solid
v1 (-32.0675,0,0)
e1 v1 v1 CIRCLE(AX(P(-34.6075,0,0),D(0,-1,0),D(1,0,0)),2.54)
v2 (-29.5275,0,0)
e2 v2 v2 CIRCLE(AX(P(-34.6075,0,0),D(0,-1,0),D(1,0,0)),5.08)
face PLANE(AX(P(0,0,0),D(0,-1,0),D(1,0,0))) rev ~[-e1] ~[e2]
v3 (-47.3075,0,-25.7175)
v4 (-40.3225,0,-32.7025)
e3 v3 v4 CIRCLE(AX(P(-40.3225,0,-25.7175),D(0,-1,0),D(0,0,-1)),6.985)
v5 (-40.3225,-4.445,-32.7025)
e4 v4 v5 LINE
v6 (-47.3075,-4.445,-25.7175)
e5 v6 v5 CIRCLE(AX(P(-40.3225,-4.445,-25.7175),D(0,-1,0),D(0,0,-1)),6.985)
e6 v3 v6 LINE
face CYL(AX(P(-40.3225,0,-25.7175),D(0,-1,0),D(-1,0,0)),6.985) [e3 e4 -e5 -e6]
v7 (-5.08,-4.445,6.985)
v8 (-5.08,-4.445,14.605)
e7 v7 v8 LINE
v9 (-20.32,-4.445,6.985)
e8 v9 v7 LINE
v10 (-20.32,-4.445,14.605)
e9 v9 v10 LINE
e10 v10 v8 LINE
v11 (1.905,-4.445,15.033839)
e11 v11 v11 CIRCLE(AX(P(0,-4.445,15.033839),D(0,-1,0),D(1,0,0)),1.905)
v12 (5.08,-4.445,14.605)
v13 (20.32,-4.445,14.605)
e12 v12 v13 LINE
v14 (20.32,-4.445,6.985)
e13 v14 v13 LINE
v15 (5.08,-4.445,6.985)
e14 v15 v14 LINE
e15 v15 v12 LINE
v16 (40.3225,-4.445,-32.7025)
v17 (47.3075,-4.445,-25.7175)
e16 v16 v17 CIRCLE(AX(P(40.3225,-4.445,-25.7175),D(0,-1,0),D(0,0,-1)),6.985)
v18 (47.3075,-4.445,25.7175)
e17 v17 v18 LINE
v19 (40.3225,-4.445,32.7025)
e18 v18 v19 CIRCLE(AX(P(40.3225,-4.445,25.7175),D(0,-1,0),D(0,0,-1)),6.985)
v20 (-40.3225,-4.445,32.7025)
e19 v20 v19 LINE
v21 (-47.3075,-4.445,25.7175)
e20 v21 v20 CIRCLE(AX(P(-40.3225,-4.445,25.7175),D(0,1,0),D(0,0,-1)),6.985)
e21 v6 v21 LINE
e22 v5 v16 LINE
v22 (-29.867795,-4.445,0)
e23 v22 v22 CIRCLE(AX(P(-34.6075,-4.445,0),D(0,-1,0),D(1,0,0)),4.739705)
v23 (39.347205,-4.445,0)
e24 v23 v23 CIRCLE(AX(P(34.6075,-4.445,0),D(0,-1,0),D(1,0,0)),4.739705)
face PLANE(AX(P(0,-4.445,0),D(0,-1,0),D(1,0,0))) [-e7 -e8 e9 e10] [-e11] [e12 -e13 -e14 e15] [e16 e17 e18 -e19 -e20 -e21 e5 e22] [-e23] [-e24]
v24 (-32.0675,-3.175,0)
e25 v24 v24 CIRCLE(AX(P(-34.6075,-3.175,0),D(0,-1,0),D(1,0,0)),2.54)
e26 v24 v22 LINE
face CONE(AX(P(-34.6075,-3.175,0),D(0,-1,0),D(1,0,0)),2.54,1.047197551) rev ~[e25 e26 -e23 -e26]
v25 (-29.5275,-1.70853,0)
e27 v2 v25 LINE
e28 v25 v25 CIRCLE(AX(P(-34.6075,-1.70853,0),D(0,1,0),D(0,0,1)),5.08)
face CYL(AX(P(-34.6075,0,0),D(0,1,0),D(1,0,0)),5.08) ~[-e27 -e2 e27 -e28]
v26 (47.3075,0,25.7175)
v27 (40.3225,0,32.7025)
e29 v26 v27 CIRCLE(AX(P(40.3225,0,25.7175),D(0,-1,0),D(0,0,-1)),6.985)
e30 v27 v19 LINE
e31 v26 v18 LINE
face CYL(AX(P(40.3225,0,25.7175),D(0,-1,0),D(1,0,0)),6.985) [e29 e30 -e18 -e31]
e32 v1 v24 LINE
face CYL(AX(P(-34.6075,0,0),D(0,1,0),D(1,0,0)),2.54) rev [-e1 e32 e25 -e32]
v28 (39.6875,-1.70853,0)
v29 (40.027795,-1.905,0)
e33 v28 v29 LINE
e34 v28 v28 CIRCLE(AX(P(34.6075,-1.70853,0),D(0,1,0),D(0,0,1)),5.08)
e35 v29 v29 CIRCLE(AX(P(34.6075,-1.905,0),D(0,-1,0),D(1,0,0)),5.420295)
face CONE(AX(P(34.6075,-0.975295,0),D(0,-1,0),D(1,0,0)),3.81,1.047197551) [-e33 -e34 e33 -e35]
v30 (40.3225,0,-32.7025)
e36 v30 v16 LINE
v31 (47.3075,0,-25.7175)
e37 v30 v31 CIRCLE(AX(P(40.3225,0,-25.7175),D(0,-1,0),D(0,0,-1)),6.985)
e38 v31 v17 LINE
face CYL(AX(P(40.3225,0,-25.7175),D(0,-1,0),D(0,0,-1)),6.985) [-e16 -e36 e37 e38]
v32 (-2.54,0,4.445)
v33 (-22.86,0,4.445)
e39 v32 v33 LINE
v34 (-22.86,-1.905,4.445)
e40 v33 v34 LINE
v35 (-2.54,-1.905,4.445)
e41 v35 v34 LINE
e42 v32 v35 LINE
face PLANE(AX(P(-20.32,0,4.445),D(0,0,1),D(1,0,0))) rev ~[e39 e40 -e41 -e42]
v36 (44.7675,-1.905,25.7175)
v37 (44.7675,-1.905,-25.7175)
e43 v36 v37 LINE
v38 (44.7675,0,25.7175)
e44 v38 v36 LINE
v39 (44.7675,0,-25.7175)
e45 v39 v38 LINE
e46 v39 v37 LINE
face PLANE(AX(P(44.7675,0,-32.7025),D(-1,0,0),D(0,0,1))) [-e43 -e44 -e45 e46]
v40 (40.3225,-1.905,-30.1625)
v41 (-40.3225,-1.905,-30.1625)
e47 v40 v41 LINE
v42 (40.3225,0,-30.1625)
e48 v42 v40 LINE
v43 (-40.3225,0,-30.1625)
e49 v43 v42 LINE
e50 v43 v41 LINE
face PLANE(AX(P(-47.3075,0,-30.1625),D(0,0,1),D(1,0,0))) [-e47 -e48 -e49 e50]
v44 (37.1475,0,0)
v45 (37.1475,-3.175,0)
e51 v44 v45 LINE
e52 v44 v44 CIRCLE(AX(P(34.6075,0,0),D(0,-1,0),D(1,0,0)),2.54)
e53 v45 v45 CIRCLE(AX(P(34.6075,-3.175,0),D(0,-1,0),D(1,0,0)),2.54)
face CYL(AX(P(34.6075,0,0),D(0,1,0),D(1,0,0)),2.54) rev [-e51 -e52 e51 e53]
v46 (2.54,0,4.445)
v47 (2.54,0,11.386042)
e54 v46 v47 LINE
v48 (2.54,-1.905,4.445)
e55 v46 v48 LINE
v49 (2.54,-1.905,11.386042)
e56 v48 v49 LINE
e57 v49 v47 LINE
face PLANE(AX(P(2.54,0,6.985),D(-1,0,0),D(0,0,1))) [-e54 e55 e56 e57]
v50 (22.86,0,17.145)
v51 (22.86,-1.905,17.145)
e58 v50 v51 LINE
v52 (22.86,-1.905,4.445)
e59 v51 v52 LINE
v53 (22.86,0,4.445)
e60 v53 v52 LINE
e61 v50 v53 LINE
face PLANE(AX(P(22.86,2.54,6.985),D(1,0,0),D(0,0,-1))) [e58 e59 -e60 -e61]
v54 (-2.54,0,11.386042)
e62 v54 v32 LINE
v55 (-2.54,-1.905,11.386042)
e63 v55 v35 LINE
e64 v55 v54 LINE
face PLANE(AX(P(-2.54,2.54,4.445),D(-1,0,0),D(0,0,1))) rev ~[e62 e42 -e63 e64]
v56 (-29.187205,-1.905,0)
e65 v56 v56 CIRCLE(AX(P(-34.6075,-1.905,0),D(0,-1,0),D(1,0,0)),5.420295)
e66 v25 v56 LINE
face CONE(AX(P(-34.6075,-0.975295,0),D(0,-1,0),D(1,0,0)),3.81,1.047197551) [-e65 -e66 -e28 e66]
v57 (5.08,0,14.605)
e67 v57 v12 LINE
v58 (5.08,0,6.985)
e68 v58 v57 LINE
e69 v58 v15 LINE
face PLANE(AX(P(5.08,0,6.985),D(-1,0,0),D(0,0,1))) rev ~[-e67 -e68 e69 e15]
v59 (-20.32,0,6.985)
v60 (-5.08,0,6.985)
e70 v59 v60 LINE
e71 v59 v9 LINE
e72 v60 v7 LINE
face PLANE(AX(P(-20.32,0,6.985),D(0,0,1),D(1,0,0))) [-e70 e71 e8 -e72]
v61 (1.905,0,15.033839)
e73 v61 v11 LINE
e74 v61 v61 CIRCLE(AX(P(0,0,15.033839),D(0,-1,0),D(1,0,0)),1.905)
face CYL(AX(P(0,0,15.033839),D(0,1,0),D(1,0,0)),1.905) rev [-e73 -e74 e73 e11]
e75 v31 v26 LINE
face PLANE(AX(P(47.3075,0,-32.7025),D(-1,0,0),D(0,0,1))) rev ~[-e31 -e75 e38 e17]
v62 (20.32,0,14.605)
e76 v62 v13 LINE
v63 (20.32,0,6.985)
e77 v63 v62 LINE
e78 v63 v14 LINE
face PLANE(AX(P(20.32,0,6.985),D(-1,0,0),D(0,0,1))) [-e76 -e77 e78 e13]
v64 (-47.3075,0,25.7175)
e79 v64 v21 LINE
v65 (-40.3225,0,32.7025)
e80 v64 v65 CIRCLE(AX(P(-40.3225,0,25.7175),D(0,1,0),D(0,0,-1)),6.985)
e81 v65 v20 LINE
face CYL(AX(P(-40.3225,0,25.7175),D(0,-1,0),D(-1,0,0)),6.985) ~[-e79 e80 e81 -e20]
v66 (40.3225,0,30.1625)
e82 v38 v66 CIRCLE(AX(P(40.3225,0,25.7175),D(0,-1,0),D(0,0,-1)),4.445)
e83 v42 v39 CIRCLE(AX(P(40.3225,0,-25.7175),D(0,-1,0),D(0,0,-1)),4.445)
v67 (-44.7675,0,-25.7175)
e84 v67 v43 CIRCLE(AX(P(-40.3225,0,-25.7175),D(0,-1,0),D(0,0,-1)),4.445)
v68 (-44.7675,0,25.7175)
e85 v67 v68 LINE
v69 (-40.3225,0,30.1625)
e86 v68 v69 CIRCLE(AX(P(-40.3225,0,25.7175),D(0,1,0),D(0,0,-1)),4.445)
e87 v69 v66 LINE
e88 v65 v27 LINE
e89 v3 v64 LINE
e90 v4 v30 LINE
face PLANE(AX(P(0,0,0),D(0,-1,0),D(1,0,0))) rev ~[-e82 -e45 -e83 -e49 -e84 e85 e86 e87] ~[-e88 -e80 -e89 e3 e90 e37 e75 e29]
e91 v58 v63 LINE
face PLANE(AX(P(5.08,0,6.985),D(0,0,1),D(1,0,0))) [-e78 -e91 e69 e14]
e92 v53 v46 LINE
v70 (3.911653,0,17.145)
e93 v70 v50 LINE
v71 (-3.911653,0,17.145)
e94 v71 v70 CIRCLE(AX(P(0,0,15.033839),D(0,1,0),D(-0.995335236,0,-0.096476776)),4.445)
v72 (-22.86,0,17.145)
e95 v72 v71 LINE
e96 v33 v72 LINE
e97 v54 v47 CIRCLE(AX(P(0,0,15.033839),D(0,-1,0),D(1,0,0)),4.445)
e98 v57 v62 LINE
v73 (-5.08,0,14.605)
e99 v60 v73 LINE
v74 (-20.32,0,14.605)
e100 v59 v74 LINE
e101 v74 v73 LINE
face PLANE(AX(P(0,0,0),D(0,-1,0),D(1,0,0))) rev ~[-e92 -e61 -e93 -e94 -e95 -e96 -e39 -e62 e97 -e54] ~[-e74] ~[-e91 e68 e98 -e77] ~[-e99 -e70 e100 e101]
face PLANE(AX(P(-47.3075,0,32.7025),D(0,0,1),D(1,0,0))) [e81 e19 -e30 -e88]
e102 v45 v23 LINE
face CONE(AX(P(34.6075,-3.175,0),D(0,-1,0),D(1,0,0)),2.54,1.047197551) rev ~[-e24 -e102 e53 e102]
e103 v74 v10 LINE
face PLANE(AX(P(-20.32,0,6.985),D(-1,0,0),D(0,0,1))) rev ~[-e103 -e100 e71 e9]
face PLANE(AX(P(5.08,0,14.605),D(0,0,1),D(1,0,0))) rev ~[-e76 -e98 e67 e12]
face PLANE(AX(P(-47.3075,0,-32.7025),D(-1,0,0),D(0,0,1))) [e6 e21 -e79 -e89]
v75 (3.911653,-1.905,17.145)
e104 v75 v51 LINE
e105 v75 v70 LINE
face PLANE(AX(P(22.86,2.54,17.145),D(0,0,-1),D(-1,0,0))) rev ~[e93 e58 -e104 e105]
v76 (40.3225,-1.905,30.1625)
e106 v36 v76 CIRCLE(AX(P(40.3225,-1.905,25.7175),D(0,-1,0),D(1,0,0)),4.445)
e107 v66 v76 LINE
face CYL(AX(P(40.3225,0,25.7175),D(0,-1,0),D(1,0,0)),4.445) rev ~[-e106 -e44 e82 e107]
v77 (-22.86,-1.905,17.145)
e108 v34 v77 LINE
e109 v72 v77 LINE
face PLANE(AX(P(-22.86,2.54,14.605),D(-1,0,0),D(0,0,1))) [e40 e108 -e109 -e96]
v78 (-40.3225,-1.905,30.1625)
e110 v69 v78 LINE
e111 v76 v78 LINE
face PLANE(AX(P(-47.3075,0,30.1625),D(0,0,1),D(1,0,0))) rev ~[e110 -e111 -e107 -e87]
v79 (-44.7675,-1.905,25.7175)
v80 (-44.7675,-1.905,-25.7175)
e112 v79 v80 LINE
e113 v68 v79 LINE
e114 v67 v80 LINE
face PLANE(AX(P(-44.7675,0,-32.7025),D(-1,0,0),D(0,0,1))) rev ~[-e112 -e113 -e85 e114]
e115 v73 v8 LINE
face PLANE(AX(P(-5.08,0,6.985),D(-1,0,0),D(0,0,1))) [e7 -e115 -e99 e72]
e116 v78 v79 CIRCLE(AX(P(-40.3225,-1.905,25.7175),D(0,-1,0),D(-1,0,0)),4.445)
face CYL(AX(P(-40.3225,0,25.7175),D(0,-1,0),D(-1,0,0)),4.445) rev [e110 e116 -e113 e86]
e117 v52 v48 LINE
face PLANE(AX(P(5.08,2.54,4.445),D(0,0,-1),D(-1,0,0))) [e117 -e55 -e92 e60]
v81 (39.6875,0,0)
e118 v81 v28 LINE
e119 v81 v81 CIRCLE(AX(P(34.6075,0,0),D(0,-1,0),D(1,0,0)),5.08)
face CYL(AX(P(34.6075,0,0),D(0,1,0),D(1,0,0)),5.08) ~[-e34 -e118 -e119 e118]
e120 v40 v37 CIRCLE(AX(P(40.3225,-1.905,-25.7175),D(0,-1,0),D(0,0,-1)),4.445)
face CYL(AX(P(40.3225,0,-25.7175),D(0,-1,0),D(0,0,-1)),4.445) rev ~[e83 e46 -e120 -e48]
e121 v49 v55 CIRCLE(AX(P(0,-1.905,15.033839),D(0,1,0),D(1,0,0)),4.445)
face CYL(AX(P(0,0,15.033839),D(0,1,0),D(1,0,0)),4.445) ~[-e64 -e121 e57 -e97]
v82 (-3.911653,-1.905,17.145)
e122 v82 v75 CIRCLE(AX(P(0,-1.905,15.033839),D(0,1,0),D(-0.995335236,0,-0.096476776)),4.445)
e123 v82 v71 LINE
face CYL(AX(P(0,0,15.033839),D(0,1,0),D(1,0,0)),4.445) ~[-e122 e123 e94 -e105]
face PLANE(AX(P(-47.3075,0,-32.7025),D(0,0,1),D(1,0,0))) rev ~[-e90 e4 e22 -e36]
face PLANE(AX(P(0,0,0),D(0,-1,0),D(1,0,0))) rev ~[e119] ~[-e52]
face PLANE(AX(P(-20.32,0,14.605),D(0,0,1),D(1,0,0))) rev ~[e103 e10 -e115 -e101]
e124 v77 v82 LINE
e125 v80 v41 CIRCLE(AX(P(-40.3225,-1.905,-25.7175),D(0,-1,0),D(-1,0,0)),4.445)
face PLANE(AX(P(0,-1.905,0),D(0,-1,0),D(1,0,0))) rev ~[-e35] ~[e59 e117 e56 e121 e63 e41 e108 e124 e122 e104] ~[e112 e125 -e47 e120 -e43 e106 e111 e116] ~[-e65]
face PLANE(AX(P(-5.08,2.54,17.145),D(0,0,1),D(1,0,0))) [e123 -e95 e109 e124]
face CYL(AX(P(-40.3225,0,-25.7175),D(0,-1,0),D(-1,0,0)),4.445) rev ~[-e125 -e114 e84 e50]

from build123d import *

# Parameters (mm, degrees)
F0_W        = 94.615
F0_H        = 65.405
F0_W_2      = 86.9950006521
F0_H_2      = 57.7850006521
F0_R        = 5.08
F0_R_2      = 2.413
F0_W_3      = 15.24
F0_H_3      = 7.62
F0_R_3      = 1.905
F0_R_4      = 2.54
F0_R_5      = 1.143
F0_W_4      = 7.112
F0_H_4      = 1.016
F1_DEPTH    = 4.445
F2_R        = 6.985
F3_SIZE2    = 2.1997045256
F3_SIZE     = 1.27
F3_2_SIZE2  = 2.1997045256
F3_2_SIZE   = 1.27
F4_T        = 2.54
F4_T3_DEPTH = 9.525


# Not quite as in the source:
# - a shell that OpenCascade refuses in one call is made with other operations: the cavity is built on its own and cut out


with BuildPart() as f1:
    # F0 (on Front) → F1 (new body)
    with BuildSketch(Plane.XZ):
        Rectangle(F0_W, F0_H)
        Rectangle(F0_W_2, F0_H_2, mode=Mode.SUBTRACT)
        Rectangle(F0_W_2, F0_H_2)
        with Locations((-34.6075, 0)):
            Circle(F0_R, mode=Mode.SUBTRACT)
        Polygon((24.765, 23.495), (24.765, -23.495), (3.556, -23.495), (-3.556, -23.495), (-24.765, -23.495), (-24.765, 23.495), align=None, mode=Mode.SUBTRACT)
        with Locations((34.6075, 0)):
            Circle(F0_R, mode=Mode.SUBTRACT)
        Polygon((-3.556, -22.479), (3.556, -22.479), (23.749, -22.479), (23.749, 22.479), (-23.749, 22.479), (-23.749, -22.479), align=None)
        with Locations((-19.685, -18.0975)):
            Circle(F0_R_2, mode=Mode.SUBTRACT)
        with Locations((19.685, -18.0975)):
            Circle(F0_R_2, mode=Mode.SUBTRACT)
        with Locations((-12.7, 10.795)):
            Rectangle(F0_W_3, F0_H_3, mode=Mode.SUBTRACT)
        with Locations((-19.685, 18.0975)):
            Circle(F0_R_2, mode=Mode.SUBTRACT)
        with Locations((0, 15.0338392705)):
            Circle(F0_R_3, mode=Mode.SUBTRACT)
        with Locations((12.7, 10.795)):
            Rectangle(F0_W_3, F0_H_3, mode=Mode.SUBTRACT)
        with Locations((19.685, 18.0975)):
            Circle(F0_R_2, mode=Mode.SUBTRACT)
        Polygon((3.556, -23.495), (24.765, -23.495), (24.765, 23.495), (-24.765, 23.495), (-24.765, -23.495), (-3.556, -23.495), (-3.556, -22.479), (-23.749, -22.479), (-23.749, 22.479), (23.749, 22.479), (23.749, -22.479), (3.556, -22.479), align=None)
        with Locations((34.6075, 0)):
            Circle(F0_R)
        with Locations((34.6075, 0)):
            Circle(F0_R_4, mode=Mode.SUBTRACT)
        with Locations((-34.6075, 0)):
            Circle(F0_R)
        with Locations((-34.6075, 0)):
            Circle(F0_R_4, mode=Mode.SUBTRACT)
        with Locations((-19.685, 18.0975)):
            Circle(F0_R_2)
        with Locations((-19.685, 18.0975)):
            Circle(F0_R_5, mode=Mode.SUBTRACT)
        with Locations((-19.685, -18.0975)):
            Circle(F0_R_2)
        with Locations((-19.685, -18.0975)):
            Circle(F0_R_5, mode=Mode.SUBTRACT)
        with Locations((19.685, -18.0975)):
            Circle(F0_R_2)
        with Locations((19.685, -18.0975)):
            Circle(F0_R_5, mode=Mode.SUBTRACT)
        with Locations((19.685, 18.0975)):
            Circle(F0_R_2)
        with Locations((19.685, 18.0975)):
            Circle(F0_R_5, mode=Mode.SUBTRACT)
        with Locations((0, -22.987)):
            Rectangle(F0_W_4, F0_H_4)
        with Locations((-19.685, 18.0975)):
            Circle(F0_R_5)
        with Locations((-19.685, -18.0975)):
            Circle(F0_R_5)
        with Locations((19.685, -18.0975)):
            Circle(F0_R_5)
        with Locations((19.685, 18.0975)):
            Circle(F0_R_5)
    extrude(amount=F1_DEPTH)

    # F2
    f2_edges = [f1.edges().sort_by_distance(p)[0] for p in [
        (-47.3075, -2.2225, 32.7025),
        (-47.3075, -2.2225, -32.7025),
        (47.3075, -2.2225, 32.7025),
        (47.3075, -2.2225, -32.7025),
    ]]
    fillet(f2_edges, radius=F2_R)

    # F3
    f3_edges = [f1.edges().sort_by_distance(p)[0] for p in [
        (-37.1475, -4.445, 0),
    ]]
    f3_side = f1.faces().sort_by_distance((-37.1475, -2.2225, 0))[0]
    chamfer(f3_edges, length=F3_SIZE, length2=F3_SIZE2, reference=f3_side)

    # F3#2
    f3_2_edges = [f1.edges().sort_by_distance(p)[0] for p in [
        (32.0675, -4.445, 0),
    ]]
    f3_2_side = f1.faces().sort_by_distance((32.0675, -2.2225, 0))[0]
    chamfer(f3_2_edges, length=F3_2_SIZE, length2=F3_2_SIZE2, reference=f3_2_side)

    # F4: shell of thickness 2.54, made by hand


with BuildPart() as f4_core1:
    # F4_t2: copy of F1
    add(f1.part)

    # the walls: a layer under each face that stays
    f4_faces = [f4_core1.faces().sort_by_distance(p)[0] for p in [
        (0, -4.445, 0),
        (30.9676477372, -3.81, 0),
        (-38.2473522628, -3.81, 0),
        (0, -2.2225, -32.7025),
        (-45.2616408666, -2.2225, -30.6566408666),
        (45.2616408666, -2.2225, -30.6566408666),
        (-47.3075, -2.2225, 0),
        (47.3075, -2.2225, 0),
        (-45.2616408666, -2.2225, 30.6566408666),
        (45.2616408666, -2.2225, 30.6566408666),
        (0, -2.2225, 32.7025),
        (20.32, -2.2225, 10.795),
        (12.7, -2.2225, 6.985),
        (5.08, -2.2225, 10.795),
        (12.7, -2.2225, 14.605),
        (-12.7, -2.2225, 6.985),
        (-20.32, -2.2225, 10.795),
        (-12.7, -2.2225, 14.605),
        (-5.08, -2.2225, 10.795),
        (-1.905, -2.2225, 15.0338392705),
        (32.0675, -1.5875, 0),
        (-37.1475, -1.5875, 0),
    ]]
    thicken(f4_faces, amount=-F4_T, mode=Mode.SUBTRACT)

    # F4_s4 → F4_t3 (cut)
    with BuildSketch(Plane.XZ.offset(-2.54)):
        Polygon((20.2946, 14.5796), (22.86, 14.605), (22.86, 17.145), (20.32, 17.145), align=None)
        Polygon((20.2946, 7.0104), (22.86, 6.985), (22.86, 4.445), (20.32, 4.445), align=None)
        Polygon((5.1054, 7.0104), (5.08, 4.445), (2.54, 4.445), (2.54, 6.985), align=None)
        Polygon((5.1054, 14.5796), (2.54, 14.605), (2.54, 17.145), (5.08, 17.145), align=None)
        Polygon((-5.1054, 7.0104), (-5.08, 4.445), (-2.54, 4.445), (-2.54, 6.985), align=None)
        Polygon((-20.2946, 7.0104), (-20.32, 4.445), (-22.86, 4.445), (-22.86, 6.985), align=None)
        Polygon((-20.2946, 14.5796), (-22.86, 14.605), (-22.86, 17.145), (-20.32, 17.145), align=None)
        Polygon((-5.1054, 14.5796), (-5.08, 17.145), (-2.54, 17.145), (-2.54, 14.605), align=None)
    extrude(amount=F4_T3_DEPTH, mode=Mode.SUBTRACT)


with BuildPart() as f1_1:
    add(f1.part)

    # what is left inside the walls is the cavity
    f4_cavity = [f4_core1.part.solids().sort_by_distance(p)[0] for p in [
        (0, -0.0254, -10.054167),
    ]]
    add(f4_cavity, mode=Mode.SUBTRACT)


solid = f1_1.part
